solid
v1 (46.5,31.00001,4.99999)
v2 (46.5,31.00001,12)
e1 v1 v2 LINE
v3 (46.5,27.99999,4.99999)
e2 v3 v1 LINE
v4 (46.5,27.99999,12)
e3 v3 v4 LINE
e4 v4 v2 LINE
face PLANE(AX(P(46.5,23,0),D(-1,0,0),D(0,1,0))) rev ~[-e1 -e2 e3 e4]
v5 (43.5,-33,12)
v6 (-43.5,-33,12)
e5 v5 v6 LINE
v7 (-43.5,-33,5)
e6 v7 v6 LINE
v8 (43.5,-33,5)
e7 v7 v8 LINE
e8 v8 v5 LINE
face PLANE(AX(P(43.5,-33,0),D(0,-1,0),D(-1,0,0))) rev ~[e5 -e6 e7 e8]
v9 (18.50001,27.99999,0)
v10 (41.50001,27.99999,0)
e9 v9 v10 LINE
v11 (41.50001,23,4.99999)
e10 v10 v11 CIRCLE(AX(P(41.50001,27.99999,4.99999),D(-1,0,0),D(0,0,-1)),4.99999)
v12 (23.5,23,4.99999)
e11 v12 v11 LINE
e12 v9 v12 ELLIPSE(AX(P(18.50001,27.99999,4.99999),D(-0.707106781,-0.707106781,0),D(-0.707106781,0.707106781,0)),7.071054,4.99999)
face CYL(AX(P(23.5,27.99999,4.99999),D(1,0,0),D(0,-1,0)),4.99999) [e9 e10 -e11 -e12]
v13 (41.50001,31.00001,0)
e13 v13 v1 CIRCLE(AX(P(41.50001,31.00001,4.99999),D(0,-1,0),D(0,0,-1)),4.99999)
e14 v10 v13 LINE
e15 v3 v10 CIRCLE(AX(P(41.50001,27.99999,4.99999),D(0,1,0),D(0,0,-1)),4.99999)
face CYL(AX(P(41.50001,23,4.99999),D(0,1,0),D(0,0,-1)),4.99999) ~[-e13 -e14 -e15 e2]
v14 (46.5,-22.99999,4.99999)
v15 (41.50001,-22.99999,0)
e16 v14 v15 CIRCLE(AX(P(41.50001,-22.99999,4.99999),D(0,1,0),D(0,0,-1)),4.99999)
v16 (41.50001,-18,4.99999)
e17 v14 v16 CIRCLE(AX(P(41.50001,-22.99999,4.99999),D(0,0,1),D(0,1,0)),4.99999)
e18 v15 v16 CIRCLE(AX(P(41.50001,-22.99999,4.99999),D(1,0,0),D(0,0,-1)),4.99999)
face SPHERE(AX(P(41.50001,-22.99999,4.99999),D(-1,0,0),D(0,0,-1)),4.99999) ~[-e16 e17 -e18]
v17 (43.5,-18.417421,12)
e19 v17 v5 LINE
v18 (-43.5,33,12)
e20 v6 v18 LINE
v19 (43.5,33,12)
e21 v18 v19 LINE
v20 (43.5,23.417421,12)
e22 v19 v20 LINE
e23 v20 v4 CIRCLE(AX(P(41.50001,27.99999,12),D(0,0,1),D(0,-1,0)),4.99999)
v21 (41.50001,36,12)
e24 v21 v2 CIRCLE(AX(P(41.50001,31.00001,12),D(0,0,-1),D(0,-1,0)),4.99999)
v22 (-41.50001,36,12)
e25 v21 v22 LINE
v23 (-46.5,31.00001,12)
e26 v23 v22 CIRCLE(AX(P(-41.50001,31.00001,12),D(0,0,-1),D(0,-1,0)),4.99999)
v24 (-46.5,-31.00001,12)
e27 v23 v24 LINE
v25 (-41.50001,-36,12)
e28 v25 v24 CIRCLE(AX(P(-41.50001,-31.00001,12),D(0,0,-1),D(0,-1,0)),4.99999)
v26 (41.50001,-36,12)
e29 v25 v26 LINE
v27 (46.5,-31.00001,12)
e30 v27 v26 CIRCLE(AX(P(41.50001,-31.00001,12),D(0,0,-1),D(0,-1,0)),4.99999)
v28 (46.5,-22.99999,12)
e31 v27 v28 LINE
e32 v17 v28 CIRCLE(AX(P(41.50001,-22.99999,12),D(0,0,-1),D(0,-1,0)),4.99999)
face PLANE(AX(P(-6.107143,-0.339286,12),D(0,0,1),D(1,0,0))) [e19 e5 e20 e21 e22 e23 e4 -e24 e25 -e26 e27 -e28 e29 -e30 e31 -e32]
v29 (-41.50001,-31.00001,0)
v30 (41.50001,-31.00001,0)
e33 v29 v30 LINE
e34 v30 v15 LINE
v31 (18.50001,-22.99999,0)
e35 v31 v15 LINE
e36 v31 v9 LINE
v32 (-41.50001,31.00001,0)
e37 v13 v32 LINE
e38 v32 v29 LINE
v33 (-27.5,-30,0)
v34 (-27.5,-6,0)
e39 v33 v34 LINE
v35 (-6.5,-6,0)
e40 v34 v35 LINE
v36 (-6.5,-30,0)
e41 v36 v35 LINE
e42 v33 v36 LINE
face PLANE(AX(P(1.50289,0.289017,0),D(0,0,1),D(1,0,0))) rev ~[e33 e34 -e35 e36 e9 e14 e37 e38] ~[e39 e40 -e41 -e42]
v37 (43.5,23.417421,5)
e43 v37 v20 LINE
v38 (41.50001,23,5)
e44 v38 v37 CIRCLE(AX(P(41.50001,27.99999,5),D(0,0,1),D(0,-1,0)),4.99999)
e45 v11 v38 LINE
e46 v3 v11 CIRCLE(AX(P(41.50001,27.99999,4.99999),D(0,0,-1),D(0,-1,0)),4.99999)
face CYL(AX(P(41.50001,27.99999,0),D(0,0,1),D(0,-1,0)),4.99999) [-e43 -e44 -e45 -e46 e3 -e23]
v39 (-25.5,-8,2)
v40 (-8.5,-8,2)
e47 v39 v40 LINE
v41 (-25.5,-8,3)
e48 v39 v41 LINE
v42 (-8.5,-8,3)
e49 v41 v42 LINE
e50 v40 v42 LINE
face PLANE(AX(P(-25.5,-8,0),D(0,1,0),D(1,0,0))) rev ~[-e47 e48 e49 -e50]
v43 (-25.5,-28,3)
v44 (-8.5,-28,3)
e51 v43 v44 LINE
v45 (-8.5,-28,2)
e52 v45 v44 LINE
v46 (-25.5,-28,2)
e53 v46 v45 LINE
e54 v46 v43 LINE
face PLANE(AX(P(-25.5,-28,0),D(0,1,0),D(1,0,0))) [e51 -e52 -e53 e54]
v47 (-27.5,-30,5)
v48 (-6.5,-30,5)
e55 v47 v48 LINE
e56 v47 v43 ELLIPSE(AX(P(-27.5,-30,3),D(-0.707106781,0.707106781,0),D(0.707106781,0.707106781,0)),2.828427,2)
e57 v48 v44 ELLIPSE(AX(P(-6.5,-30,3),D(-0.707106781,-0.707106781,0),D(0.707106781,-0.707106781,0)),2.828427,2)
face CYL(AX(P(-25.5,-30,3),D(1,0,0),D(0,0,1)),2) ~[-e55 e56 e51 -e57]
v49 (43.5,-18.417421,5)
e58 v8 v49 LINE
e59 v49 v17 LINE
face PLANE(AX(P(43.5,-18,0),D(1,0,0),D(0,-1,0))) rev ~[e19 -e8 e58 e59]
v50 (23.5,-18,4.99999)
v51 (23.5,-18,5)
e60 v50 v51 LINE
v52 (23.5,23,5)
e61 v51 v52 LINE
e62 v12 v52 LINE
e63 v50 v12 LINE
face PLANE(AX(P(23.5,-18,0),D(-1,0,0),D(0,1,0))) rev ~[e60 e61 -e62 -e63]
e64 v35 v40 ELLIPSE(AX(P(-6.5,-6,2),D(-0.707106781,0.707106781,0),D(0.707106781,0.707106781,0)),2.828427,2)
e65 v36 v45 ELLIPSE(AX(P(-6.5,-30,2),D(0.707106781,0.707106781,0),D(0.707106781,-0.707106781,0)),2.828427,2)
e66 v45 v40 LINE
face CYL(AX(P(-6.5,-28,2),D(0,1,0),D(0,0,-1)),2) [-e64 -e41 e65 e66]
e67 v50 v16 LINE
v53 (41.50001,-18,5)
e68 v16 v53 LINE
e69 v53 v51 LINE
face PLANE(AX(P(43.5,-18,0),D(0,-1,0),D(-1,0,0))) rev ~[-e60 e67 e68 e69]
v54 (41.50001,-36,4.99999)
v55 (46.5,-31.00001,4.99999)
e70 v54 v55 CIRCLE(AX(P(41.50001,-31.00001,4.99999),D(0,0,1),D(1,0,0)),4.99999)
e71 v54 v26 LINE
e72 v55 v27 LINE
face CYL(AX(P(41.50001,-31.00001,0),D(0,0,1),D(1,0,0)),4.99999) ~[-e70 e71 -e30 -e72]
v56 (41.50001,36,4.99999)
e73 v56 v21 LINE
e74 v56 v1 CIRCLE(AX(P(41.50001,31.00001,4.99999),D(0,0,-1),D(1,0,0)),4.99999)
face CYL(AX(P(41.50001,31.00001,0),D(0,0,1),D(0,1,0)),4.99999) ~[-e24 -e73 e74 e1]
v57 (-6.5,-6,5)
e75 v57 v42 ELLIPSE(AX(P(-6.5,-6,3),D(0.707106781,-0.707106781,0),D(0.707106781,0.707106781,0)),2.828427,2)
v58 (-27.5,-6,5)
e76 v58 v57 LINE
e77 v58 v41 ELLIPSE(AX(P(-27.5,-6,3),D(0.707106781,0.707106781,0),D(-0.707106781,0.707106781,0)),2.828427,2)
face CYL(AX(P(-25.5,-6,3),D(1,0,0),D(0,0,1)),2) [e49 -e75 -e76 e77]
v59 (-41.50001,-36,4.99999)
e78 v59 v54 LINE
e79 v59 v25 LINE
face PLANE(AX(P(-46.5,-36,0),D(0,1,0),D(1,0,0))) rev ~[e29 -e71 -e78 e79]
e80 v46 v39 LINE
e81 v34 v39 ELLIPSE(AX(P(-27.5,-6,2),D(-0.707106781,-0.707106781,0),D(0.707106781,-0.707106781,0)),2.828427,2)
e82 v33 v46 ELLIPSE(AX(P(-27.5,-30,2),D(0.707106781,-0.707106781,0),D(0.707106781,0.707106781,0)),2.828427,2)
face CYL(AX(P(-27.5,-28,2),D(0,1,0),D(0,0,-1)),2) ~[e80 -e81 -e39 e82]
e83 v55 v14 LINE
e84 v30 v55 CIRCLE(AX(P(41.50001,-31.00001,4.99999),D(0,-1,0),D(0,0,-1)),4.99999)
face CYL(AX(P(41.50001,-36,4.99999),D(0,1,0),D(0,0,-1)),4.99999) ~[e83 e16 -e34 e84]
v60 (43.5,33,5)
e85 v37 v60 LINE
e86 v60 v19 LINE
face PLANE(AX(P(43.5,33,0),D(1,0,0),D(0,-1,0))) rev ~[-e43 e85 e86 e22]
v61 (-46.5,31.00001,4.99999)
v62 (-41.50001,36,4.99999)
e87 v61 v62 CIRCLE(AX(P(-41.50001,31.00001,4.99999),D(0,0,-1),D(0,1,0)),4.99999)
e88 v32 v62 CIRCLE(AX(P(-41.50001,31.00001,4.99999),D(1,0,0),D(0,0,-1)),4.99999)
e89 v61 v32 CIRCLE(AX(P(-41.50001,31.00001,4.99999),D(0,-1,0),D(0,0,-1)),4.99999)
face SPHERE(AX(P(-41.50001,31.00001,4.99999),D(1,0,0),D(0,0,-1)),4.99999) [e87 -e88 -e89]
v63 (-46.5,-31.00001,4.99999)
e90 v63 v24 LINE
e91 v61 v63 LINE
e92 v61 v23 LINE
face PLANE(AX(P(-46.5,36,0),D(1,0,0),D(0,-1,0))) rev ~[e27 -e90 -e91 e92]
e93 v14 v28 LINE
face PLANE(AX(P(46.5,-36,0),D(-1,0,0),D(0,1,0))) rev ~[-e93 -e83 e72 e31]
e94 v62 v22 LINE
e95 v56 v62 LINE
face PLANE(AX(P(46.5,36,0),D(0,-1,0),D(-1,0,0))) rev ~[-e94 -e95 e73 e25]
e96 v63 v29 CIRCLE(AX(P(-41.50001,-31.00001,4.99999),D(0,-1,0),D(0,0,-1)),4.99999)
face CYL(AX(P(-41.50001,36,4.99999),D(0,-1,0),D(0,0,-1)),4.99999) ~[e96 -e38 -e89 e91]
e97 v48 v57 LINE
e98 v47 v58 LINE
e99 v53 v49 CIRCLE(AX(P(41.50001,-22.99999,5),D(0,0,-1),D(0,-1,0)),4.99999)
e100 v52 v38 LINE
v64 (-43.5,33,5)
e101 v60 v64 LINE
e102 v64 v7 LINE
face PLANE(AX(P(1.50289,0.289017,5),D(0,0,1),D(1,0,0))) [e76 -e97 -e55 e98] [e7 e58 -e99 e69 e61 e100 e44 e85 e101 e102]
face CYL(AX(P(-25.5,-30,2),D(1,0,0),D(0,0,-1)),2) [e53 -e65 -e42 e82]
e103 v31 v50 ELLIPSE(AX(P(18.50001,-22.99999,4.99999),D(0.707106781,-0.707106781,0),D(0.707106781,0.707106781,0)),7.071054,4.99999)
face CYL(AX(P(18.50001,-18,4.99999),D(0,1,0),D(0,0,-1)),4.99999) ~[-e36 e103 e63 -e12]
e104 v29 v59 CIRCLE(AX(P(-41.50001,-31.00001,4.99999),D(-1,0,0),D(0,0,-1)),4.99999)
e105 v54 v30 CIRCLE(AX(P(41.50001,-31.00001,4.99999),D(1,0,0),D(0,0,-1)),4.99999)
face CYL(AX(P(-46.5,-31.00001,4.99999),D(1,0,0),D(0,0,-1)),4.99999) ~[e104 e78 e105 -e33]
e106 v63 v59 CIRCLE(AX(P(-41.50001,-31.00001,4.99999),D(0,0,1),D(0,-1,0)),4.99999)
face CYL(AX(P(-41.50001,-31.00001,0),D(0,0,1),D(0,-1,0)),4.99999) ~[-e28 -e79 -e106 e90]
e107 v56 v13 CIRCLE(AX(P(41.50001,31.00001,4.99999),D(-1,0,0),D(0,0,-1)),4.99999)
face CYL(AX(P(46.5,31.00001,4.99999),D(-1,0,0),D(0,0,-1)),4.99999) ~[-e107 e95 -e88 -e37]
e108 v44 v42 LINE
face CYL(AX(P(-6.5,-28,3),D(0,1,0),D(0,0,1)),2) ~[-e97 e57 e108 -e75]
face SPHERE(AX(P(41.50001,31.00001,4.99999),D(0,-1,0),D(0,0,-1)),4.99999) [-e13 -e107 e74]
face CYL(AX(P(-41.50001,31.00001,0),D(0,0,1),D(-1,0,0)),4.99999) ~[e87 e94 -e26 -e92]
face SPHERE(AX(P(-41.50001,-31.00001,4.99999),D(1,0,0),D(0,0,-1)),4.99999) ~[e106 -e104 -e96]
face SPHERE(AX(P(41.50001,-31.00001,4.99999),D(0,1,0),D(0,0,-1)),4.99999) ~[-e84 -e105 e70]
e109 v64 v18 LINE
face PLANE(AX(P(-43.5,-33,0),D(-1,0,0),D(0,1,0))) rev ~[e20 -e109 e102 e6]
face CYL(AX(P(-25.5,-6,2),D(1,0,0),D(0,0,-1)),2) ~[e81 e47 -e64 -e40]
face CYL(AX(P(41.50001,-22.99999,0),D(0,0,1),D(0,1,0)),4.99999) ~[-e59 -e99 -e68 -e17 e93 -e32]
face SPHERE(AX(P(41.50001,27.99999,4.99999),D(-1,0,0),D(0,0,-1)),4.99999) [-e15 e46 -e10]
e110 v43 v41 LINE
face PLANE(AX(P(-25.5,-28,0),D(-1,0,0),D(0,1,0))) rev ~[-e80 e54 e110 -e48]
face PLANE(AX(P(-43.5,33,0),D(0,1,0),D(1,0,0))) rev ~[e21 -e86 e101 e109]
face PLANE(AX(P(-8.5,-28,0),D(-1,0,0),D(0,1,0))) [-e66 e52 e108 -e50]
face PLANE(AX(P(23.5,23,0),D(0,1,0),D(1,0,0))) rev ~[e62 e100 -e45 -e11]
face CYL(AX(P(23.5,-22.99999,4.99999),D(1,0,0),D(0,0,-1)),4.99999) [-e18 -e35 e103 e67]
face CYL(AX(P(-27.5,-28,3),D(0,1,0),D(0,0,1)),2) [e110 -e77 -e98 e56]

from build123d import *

# Parameters (mm, degrees)
F1_DEPTH = 12
F0_W     = 17
F0_H     = 20
F2_DEPTH = 5
F3_R     = 4.99999
F4_R     = 2


# Not quite as in the source:
# - a fillet or chamfer is up to 0.001 mm smaller than in the source, because OpenCascade refuses the exact size


with BuildPart() as f1:
    # F0 (on Top) → F1 (new body)
    with BuildSketch(Plane.XY):
        Polygon((-43.5, 33), (43.5, 33), (43.5, 23), (46.5, 23), (46.5, 36), (-46.5, 36), (-46.5, -36), (46.5, -36), (46.5, -18), (43.5, -18), (43.5, -33), (-43.5, -33), align=None)
    extrude(amount=F1_DEPTH)

    # F0 (on Top) → F2 (join)
    with BuildSketch(Plane.XY):
        Polygon((43.5, 23), (43.5, 33), (-43.5, 33), (-43.5, -33), (43.5, -33), (43.5, -18), (23.5, -18), (23.5, 23), align=None)
        with Locations((-17, -18)):
            Rectangle(F0_W, F0_H, mode=Mode.SUBTRACT)
    extrude(amount=F2_DEPTH)

    # F3 (radius 5 in the source; OpenCascade refuses exactly that, so slightly less here)
    f3_edges = [f1.edges().sort_by_distance(p)[0] for p in [
        (23.5, 2.5, 0),
        (35, -18, 0),
        (35, 23, 0),
        (46.5, 29.5, 0),
        (46.5, -27, 0),
        (0, -36, 0),
        (0, 36, 0),
        (-46.5, 0, 0),
        (-46.5, 36, 6),
        (46.5, 36, 6),
        (46.5, -36, 6),
        (-46.5, -36, 6),
        (46.5, -18, 6),
        (46.5, 23, 6),
    ]]
    fillet(f3_edges, radius=F3_R)

    # F4
    f4_edges = [f1.edges().sort_by_distance(p)[0] for p in [
        (-25.5, -18, 5),
        (-17, -28, 5),
        (-17, -8, 5),
        (-8.5, -18, 5),
        (-17, -8, 0),
        (-25.5, -18, 0),
        (-17, -28, 0),
        (-8.5, -18, 0),
    ]]
    fillet(f4_edges, radius=F4_R)


solid = f1.part
